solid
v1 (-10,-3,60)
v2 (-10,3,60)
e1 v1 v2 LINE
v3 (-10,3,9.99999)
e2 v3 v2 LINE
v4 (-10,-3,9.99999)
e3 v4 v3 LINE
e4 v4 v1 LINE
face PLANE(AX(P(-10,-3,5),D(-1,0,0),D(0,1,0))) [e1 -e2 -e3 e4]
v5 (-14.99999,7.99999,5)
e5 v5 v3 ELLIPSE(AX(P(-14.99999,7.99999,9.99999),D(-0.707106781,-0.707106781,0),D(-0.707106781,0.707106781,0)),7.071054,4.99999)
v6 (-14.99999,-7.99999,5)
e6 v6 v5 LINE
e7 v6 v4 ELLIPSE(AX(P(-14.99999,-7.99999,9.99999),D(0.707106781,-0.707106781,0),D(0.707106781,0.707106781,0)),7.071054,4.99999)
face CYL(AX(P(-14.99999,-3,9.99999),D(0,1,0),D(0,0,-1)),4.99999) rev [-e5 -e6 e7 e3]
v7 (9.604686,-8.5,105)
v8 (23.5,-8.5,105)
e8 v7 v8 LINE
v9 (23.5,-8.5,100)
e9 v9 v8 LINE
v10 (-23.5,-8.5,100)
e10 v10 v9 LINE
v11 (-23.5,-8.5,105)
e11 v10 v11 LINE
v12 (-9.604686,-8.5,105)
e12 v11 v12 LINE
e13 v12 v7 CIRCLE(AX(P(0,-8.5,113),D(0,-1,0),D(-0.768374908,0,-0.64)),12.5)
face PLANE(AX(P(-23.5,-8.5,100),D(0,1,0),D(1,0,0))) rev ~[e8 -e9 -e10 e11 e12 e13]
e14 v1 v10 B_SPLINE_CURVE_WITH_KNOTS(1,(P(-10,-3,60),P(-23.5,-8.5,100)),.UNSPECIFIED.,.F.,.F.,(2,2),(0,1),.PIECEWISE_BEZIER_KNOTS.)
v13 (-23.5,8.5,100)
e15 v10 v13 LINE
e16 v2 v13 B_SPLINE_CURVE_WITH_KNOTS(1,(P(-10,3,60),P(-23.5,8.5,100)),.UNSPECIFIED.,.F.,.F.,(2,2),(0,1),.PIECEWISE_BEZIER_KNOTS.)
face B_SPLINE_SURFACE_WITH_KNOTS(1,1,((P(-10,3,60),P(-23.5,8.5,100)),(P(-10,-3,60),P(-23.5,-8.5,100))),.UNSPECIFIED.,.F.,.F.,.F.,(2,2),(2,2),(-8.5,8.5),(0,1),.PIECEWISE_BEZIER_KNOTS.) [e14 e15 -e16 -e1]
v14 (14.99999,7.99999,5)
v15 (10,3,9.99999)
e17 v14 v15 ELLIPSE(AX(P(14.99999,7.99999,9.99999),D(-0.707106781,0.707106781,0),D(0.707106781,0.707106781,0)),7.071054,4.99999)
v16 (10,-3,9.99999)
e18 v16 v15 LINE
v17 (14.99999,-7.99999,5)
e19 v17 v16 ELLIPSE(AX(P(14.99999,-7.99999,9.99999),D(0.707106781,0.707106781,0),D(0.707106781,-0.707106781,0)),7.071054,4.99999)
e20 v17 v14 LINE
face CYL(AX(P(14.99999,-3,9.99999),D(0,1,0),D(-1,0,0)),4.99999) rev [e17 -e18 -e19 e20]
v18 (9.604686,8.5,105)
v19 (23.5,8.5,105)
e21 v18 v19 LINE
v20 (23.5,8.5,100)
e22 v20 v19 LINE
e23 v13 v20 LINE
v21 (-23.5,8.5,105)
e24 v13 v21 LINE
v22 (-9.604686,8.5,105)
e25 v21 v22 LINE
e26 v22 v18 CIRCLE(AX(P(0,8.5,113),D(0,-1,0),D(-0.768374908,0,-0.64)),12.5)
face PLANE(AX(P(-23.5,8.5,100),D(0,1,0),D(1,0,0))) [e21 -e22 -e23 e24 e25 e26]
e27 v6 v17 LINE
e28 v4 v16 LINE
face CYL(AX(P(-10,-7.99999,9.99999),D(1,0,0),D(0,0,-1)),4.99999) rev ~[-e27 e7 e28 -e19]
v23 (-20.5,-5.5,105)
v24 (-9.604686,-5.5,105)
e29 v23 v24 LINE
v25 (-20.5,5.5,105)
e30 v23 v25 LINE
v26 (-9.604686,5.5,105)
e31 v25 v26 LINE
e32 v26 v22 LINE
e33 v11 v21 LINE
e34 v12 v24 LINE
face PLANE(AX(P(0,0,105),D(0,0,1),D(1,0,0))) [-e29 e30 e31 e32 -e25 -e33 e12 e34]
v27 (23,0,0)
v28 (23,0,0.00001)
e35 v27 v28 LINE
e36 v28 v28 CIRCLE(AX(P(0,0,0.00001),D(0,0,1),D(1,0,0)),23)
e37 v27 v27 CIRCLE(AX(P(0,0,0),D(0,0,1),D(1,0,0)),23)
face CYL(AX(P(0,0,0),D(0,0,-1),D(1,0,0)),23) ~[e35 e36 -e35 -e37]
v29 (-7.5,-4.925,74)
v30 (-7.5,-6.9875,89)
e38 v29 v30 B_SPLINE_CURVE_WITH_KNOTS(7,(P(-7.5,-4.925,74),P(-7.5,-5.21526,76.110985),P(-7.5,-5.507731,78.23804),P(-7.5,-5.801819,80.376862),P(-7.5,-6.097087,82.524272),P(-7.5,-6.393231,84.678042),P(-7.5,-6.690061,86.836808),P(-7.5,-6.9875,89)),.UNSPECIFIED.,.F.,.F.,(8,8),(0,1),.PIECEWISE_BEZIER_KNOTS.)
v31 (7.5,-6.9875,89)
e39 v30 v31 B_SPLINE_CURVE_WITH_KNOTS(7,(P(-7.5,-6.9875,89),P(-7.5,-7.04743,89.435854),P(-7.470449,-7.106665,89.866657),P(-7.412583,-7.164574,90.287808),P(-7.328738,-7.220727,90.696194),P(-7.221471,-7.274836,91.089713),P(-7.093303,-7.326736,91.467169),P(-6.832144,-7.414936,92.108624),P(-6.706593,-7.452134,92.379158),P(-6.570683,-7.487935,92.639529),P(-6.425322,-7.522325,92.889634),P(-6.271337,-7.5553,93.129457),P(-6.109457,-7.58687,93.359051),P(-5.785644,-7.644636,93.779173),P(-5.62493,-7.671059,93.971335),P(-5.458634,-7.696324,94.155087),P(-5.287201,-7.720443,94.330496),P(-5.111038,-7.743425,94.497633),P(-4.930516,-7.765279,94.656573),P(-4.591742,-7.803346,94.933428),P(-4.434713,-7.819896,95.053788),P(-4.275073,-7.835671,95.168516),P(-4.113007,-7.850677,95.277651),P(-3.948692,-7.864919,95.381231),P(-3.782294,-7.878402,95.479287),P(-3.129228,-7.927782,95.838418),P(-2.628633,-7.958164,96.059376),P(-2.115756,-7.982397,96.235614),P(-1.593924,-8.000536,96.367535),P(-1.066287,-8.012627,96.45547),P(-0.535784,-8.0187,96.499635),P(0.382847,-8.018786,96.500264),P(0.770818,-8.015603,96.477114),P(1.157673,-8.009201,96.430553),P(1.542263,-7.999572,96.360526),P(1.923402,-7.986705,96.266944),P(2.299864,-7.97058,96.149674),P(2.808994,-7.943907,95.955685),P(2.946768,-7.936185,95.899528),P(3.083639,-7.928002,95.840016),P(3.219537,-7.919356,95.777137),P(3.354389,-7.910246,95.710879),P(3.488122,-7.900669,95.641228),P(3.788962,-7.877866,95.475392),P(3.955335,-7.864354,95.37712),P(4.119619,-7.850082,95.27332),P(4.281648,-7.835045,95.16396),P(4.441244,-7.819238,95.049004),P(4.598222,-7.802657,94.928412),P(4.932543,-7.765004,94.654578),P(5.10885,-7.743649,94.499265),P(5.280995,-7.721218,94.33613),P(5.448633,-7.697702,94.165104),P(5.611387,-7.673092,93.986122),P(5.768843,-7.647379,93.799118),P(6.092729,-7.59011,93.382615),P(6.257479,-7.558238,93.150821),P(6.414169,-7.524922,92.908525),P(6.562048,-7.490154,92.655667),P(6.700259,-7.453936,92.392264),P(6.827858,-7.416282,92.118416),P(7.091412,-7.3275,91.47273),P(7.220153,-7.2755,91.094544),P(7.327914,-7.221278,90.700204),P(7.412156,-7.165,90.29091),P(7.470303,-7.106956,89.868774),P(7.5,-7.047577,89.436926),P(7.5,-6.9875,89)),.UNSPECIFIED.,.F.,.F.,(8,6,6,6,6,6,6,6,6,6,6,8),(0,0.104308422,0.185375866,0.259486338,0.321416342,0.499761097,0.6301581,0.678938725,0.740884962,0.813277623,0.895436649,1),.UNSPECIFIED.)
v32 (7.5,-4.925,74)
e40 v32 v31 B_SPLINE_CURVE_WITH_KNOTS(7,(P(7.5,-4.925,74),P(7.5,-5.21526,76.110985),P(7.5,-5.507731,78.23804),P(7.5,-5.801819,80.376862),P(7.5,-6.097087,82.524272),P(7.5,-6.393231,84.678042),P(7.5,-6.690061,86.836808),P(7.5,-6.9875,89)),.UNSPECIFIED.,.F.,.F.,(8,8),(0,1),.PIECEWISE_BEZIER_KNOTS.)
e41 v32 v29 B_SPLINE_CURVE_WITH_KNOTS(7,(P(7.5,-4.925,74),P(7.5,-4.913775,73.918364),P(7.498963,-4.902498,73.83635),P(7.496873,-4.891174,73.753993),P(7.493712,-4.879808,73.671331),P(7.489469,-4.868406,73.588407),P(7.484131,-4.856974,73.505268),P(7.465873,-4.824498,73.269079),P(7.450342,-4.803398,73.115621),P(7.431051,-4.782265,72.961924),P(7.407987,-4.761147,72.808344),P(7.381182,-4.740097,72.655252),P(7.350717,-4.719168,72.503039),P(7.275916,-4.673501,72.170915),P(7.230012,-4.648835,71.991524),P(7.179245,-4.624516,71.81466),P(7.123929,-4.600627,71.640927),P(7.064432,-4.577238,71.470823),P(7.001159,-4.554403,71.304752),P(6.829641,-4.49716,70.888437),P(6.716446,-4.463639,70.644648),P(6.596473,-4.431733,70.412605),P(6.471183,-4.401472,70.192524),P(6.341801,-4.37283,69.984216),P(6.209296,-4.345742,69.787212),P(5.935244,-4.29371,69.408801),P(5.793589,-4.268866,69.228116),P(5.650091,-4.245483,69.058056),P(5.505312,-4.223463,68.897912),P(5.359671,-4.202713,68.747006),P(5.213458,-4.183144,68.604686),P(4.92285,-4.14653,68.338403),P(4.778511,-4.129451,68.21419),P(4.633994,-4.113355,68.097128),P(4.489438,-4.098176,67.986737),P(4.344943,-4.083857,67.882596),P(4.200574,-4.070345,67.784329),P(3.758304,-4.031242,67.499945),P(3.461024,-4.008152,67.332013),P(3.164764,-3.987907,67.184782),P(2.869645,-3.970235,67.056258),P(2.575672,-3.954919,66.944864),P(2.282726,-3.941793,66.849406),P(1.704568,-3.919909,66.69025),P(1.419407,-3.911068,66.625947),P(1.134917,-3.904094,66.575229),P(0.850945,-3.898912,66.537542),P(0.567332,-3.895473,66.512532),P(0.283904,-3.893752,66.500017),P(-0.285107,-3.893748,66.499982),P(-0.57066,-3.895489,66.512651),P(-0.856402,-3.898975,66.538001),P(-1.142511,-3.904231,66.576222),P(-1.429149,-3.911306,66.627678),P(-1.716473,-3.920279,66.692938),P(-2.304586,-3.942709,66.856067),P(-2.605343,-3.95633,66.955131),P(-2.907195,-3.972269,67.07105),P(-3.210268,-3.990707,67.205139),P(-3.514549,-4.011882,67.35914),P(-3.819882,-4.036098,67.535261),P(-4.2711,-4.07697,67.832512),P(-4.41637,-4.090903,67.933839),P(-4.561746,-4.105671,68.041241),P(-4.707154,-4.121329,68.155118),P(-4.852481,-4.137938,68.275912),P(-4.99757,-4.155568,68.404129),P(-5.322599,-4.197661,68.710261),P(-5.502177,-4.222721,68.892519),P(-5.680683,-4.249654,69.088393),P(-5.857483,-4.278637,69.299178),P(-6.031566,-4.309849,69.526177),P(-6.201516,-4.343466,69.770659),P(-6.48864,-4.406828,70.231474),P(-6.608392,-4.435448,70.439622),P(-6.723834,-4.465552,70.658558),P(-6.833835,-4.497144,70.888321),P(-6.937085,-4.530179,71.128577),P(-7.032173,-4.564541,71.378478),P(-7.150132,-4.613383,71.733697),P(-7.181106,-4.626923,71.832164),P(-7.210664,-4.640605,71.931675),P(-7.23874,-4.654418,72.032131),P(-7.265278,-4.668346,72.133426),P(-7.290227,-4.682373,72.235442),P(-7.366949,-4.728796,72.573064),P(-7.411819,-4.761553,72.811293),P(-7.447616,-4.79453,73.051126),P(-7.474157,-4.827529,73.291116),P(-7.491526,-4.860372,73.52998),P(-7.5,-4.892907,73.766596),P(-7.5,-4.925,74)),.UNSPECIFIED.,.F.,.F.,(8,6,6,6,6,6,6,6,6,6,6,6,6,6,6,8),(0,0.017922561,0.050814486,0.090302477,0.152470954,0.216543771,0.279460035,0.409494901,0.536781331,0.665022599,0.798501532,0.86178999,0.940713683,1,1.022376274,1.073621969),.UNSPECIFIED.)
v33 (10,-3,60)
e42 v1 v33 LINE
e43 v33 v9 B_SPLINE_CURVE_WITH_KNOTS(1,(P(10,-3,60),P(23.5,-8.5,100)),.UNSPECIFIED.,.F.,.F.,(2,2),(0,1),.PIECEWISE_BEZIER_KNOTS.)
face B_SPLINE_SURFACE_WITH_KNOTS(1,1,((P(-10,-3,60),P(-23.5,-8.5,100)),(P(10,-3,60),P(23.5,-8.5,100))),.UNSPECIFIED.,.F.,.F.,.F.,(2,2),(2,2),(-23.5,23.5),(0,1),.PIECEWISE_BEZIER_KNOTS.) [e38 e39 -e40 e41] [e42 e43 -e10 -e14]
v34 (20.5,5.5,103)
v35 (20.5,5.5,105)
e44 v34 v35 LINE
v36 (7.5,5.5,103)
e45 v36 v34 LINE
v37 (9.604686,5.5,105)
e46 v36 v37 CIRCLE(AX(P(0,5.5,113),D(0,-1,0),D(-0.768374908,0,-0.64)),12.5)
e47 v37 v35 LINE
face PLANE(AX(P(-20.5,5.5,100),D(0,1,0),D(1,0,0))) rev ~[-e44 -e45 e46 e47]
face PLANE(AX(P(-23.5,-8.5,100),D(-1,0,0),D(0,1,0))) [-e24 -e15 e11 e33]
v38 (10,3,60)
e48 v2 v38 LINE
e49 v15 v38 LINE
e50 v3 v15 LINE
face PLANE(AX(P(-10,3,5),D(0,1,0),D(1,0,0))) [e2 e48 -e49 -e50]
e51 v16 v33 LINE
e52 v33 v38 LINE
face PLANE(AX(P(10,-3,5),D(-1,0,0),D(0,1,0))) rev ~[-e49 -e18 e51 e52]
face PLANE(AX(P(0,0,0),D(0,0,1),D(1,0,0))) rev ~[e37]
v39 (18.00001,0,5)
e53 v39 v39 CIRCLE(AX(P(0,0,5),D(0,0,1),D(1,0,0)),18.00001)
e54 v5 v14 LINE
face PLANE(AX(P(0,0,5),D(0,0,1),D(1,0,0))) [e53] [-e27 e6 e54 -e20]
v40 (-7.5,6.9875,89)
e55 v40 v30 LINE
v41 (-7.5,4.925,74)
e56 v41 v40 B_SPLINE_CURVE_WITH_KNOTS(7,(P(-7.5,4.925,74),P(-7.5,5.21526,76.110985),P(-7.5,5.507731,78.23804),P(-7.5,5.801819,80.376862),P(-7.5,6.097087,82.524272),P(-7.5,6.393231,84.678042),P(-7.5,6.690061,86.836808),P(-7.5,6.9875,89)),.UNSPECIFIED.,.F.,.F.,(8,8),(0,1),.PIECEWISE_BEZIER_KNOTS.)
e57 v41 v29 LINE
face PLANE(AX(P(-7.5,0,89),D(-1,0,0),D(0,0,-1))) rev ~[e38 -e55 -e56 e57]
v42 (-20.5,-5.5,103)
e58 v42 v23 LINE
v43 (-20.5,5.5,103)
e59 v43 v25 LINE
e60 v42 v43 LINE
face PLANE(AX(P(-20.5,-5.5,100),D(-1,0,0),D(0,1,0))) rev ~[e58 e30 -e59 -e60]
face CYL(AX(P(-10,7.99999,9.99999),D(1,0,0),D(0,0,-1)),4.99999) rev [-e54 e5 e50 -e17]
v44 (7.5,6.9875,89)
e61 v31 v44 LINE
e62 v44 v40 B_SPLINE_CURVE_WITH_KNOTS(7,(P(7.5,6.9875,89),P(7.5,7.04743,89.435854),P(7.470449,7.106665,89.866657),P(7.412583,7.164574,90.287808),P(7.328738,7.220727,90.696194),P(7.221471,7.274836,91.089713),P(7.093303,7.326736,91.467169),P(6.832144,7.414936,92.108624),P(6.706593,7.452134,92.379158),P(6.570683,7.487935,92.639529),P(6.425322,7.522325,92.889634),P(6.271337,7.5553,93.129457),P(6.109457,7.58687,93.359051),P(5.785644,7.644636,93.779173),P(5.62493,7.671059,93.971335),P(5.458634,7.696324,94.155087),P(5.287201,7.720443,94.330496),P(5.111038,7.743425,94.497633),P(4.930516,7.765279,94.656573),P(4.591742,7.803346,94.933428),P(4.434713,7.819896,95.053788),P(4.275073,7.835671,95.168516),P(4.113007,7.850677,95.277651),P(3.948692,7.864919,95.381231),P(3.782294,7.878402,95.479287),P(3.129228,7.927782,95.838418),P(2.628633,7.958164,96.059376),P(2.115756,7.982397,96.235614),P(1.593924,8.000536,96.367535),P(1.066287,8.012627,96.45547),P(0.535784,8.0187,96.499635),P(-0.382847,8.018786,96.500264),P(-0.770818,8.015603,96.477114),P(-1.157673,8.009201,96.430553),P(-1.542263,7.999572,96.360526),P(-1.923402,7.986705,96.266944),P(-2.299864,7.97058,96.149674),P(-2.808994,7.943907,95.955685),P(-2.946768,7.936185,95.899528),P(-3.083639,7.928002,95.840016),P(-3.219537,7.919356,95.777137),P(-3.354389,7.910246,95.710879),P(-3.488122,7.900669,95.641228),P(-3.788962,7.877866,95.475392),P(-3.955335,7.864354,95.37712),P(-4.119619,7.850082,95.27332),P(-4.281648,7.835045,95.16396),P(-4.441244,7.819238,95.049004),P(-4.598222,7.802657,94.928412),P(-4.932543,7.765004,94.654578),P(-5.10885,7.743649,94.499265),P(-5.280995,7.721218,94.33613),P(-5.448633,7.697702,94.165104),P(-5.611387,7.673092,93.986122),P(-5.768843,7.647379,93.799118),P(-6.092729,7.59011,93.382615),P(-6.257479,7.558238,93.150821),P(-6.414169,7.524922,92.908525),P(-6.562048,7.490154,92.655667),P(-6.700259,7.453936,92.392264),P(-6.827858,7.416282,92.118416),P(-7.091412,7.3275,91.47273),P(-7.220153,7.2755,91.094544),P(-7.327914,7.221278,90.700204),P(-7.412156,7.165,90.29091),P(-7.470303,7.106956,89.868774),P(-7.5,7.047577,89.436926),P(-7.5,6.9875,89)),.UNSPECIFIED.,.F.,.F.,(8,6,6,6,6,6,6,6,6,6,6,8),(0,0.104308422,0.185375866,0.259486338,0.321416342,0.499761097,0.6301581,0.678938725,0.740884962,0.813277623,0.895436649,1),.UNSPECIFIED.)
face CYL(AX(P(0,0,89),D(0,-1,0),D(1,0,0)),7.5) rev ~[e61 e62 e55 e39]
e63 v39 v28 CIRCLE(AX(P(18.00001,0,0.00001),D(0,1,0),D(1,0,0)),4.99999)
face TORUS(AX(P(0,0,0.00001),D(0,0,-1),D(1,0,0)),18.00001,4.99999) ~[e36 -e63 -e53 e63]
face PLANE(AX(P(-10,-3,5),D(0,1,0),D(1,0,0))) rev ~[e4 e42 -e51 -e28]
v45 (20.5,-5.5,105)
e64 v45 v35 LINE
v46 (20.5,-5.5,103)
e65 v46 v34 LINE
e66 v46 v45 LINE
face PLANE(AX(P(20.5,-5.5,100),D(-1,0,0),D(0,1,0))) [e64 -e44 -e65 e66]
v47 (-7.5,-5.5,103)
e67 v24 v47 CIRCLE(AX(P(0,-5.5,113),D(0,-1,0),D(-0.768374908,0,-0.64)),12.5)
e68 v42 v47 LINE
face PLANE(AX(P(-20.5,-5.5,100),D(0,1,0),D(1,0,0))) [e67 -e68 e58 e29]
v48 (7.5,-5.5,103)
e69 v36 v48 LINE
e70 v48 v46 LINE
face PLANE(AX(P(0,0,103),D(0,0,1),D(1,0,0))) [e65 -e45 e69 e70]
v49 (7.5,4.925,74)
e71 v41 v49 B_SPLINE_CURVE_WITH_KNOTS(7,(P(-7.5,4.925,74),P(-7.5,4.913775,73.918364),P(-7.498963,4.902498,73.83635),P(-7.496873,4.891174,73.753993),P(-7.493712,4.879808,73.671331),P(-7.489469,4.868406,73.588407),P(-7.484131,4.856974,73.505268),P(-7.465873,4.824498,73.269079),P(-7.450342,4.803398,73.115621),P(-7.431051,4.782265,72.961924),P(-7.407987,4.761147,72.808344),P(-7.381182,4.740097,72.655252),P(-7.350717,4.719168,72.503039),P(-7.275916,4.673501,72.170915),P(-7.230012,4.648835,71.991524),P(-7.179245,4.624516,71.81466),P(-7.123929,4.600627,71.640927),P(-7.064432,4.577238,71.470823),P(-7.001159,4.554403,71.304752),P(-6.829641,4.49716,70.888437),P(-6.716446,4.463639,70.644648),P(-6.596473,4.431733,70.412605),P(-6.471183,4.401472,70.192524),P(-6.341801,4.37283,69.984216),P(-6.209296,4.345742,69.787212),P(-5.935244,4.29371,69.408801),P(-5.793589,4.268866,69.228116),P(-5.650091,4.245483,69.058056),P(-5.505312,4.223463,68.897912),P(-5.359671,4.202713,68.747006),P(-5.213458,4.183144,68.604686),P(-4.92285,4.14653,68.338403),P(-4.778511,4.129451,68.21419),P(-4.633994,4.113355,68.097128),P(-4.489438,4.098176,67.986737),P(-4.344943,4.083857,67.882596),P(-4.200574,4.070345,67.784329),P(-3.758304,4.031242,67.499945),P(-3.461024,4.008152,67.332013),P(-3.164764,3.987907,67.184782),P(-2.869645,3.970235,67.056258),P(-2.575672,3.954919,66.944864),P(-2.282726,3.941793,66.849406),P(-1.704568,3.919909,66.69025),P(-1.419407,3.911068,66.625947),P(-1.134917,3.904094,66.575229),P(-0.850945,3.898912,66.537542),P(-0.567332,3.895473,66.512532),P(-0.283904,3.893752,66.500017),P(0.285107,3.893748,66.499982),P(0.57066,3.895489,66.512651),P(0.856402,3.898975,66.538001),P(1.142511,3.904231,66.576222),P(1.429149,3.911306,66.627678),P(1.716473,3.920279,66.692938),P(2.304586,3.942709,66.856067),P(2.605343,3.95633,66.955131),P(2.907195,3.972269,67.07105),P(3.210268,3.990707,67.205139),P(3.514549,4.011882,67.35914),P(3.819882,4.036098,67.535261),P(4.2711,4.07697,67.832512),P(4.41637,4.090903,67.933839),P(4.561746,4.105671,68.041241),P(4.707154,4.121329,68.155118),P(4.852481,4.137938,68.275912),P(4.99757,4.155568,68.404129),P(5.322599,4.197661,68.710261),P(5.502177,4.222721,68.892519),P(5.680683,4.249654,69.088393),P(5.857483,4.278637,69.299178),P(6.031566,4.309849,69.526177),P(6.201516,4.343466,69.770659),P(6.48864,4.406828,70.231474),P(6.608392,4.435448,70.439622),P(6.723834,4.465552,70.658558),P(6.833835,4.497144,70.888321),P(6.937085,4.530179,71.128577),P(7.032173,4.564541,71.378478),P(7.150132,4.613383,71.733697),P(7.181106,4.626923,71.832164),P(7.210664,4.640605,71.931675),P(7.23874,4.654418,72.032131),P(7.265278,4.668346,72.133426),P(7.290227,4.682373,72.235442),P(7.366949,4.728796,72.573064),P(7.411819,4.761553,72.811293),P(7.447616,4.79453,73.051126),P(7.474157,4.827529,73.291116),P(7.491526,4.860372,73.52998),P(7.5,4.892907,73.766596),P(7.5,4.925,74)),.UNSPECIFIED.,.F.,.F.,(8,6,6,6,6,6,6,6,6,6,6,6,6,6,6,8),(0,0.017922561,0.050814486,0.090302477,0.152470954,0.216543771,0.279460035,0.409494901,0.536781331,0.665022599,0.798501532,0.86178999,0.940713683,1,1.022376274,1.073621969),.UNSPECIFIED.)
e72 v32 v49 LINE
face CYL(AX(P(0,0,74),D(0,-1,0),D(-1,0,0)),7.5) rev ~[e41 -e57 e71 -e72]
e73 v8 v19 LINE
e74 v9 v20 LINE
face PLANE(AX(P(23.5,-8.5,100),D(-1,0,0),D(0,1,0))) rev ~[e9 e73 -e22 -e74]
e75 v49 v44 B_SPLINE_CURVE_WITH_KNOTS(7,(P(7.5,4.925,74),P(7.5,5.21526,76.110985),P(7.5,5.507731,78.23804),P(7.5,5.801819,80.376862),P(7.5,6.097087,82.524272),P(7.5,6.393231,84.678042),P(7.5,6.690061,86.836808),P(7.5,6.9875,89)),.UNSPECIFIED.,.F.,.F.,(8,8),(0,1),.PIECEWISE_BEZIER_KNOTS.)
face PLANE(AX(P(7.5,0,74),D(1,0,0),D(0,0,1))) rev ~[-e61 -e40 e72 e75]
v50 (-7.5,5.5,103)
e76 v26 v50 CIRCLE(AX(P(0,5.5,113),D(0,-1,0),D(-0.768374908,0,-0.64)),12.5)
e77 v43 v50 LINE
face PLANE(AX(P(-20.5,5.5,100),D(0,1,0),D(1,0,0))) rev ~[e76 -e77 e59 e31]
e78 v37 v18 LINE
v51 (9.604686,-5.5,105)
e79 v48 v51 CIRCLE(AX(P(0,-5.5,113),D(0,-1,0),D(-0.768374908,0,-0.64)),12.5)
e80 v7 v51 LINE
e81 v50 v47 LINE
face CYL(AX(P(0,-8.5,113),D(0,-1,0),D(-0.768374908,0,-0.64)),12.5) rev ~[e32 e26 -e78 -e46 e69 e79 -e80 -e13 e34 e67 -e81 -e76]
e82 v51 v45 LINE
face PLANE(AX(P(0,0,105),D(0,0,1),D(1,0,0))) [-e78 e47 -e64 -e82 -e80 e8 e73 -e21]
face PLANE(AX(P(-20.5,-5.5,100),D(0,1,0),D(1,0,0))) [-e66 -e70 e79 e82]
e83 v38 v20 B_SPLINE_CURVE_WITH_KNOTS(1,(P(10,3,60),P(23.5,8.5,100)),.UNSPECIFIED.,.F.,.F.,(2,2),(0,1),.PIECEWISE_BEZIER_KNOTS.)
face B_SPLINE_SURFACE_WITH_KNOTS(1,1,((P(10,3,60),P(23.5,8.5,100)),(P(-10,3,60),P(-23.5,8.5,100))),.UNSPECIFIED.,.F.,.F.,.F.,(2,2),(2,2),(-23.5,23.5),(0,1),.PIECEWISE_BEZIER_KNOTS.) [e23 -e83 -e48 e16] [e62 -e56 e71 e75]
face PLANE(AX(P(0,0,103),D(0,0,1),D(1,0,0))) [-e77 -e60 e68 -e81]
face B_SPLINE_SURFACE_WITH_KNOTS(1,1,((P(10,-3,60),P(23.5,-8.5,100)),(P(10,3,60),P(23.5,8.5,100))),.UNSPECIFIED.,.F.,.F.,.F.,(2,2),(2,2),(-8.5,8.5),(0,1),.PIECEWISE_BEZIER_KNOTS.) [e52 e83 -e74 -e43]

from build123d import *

# Parameters (mm, degrees)
F1_W       = 41
F1_H       = 11
F2_DEPTH   = 3
F1_W_2     = 47
F1_H_2     = 17
F3_DEPTH   = 5
F5_DEPTH   = 17.001
F6_R       = 23
F7_DEPTH   = 5
F8_W       = 20
F8_H       = 6
F9_DEPTH   = 55
F9_FACE_W  = 20
F9_FACE_H  = 6
F3_FACE1_W = 47
F3_FACE1_H = 17
F12_DEPTH  = 25
F13_R      = 4.99999


# Not quite as in the source:
# - a fillet or chamfer is up to 0.001 mm smaller than in the source, because OpenCascade refuses the exact size


with BuildPart() as f2:
    # F1 (on offset) → F2 (new body)
    with BuildSketch(Plane.XY.offset(100)):
        Rectangle(F1_W, F1_H)
    extrude(amount=F2_DEPTH)

    # F1 (on offset) → F3 (join)
    with BuildSketch(Plane.XY.offset(100)):
        Rectangle(F1_W_2, F1_H_2)
        Rectangle(F1_W, F1_H, mode=Mode.SUBTRACT)
    extrude(amount=F3_DEPTH)

    # F4 (on face) → F5 (cut, through all)
    with BuildSketch(Plane.XZ.offset(8.5)):
        with BuildLine():
            Line((9.6046863561, 105), (-9.6046863561, 105))
            ThreePointArc((-9.6046863561, 105), (0, 100.5), (9.6046863561, 105))
        make_face()
    extrude(amount=-F5_DEPTH, mode=Mode.SUBTRACT)



with BuildPart() as f7:
    # F6 (on Top) → F7 (new body)
    with BuildSketch(Plane.XY):
        Circle(F6_R)
    extrude(amount=F7_DEPTH)

    # F8 (on face) → F9 (join)
    with BuildSketch(Plane.XY.offset(5)):
        Rectangle(F8_W, F8_H)
    extrude(amount=F9_DEPTH)


with BuildPart() as f2_1:
    add(f2.part)

    add(f7.part)  # F10 merges F7
    # F9_face (on face) → F10 section 0
    with BuildSketch(Plane.XY.offset(60)):
        Rectangle(F9_FACE_W, F9_FACE_H)
    # F3_face1 (on face) → F10 section 1
    with BuildSketch(Plane(origin=(0, 0, 100), x_dir=(1, 0, 0), z_dir=(0, 0, -1))):
        Rectangle(F3_FACE1_W, F3_FACE1_H)
    loft()

    # F11 (on Front) → F12 (cut, symmetric)
    with BuildSketch(Plane.XZ):
        with BuildLine():
            ThreePointArc((7.5, 89), (0, 96.5), (-7.5, 89))
            Line((-7.5, 89), (-7.5, 74))
            ThreePointArc((-7.5, 74), (0, 66.5), (7.5, 74))
            Line((7.5, 74), (7.5, 89))
        make_face()
    extrude(amount=F12_DEPTH, both=True, mode=Mode.SUBTRACT)

    # F13 (radius 5 in the source; OpenCascade refuses exactly that, so slightly less here)
    f13_edges = [f2_1.edges().sort_by_distance(p)[0] for p in [
        (0, -3, 5),
        (-10, 0, 5),
        (0, 3, 5),
        (10, 0, 5),
        (-23, 0, 5),
    ]]
    fillet(f13_edges, radius=F13_R)


solid = f2_1.part
